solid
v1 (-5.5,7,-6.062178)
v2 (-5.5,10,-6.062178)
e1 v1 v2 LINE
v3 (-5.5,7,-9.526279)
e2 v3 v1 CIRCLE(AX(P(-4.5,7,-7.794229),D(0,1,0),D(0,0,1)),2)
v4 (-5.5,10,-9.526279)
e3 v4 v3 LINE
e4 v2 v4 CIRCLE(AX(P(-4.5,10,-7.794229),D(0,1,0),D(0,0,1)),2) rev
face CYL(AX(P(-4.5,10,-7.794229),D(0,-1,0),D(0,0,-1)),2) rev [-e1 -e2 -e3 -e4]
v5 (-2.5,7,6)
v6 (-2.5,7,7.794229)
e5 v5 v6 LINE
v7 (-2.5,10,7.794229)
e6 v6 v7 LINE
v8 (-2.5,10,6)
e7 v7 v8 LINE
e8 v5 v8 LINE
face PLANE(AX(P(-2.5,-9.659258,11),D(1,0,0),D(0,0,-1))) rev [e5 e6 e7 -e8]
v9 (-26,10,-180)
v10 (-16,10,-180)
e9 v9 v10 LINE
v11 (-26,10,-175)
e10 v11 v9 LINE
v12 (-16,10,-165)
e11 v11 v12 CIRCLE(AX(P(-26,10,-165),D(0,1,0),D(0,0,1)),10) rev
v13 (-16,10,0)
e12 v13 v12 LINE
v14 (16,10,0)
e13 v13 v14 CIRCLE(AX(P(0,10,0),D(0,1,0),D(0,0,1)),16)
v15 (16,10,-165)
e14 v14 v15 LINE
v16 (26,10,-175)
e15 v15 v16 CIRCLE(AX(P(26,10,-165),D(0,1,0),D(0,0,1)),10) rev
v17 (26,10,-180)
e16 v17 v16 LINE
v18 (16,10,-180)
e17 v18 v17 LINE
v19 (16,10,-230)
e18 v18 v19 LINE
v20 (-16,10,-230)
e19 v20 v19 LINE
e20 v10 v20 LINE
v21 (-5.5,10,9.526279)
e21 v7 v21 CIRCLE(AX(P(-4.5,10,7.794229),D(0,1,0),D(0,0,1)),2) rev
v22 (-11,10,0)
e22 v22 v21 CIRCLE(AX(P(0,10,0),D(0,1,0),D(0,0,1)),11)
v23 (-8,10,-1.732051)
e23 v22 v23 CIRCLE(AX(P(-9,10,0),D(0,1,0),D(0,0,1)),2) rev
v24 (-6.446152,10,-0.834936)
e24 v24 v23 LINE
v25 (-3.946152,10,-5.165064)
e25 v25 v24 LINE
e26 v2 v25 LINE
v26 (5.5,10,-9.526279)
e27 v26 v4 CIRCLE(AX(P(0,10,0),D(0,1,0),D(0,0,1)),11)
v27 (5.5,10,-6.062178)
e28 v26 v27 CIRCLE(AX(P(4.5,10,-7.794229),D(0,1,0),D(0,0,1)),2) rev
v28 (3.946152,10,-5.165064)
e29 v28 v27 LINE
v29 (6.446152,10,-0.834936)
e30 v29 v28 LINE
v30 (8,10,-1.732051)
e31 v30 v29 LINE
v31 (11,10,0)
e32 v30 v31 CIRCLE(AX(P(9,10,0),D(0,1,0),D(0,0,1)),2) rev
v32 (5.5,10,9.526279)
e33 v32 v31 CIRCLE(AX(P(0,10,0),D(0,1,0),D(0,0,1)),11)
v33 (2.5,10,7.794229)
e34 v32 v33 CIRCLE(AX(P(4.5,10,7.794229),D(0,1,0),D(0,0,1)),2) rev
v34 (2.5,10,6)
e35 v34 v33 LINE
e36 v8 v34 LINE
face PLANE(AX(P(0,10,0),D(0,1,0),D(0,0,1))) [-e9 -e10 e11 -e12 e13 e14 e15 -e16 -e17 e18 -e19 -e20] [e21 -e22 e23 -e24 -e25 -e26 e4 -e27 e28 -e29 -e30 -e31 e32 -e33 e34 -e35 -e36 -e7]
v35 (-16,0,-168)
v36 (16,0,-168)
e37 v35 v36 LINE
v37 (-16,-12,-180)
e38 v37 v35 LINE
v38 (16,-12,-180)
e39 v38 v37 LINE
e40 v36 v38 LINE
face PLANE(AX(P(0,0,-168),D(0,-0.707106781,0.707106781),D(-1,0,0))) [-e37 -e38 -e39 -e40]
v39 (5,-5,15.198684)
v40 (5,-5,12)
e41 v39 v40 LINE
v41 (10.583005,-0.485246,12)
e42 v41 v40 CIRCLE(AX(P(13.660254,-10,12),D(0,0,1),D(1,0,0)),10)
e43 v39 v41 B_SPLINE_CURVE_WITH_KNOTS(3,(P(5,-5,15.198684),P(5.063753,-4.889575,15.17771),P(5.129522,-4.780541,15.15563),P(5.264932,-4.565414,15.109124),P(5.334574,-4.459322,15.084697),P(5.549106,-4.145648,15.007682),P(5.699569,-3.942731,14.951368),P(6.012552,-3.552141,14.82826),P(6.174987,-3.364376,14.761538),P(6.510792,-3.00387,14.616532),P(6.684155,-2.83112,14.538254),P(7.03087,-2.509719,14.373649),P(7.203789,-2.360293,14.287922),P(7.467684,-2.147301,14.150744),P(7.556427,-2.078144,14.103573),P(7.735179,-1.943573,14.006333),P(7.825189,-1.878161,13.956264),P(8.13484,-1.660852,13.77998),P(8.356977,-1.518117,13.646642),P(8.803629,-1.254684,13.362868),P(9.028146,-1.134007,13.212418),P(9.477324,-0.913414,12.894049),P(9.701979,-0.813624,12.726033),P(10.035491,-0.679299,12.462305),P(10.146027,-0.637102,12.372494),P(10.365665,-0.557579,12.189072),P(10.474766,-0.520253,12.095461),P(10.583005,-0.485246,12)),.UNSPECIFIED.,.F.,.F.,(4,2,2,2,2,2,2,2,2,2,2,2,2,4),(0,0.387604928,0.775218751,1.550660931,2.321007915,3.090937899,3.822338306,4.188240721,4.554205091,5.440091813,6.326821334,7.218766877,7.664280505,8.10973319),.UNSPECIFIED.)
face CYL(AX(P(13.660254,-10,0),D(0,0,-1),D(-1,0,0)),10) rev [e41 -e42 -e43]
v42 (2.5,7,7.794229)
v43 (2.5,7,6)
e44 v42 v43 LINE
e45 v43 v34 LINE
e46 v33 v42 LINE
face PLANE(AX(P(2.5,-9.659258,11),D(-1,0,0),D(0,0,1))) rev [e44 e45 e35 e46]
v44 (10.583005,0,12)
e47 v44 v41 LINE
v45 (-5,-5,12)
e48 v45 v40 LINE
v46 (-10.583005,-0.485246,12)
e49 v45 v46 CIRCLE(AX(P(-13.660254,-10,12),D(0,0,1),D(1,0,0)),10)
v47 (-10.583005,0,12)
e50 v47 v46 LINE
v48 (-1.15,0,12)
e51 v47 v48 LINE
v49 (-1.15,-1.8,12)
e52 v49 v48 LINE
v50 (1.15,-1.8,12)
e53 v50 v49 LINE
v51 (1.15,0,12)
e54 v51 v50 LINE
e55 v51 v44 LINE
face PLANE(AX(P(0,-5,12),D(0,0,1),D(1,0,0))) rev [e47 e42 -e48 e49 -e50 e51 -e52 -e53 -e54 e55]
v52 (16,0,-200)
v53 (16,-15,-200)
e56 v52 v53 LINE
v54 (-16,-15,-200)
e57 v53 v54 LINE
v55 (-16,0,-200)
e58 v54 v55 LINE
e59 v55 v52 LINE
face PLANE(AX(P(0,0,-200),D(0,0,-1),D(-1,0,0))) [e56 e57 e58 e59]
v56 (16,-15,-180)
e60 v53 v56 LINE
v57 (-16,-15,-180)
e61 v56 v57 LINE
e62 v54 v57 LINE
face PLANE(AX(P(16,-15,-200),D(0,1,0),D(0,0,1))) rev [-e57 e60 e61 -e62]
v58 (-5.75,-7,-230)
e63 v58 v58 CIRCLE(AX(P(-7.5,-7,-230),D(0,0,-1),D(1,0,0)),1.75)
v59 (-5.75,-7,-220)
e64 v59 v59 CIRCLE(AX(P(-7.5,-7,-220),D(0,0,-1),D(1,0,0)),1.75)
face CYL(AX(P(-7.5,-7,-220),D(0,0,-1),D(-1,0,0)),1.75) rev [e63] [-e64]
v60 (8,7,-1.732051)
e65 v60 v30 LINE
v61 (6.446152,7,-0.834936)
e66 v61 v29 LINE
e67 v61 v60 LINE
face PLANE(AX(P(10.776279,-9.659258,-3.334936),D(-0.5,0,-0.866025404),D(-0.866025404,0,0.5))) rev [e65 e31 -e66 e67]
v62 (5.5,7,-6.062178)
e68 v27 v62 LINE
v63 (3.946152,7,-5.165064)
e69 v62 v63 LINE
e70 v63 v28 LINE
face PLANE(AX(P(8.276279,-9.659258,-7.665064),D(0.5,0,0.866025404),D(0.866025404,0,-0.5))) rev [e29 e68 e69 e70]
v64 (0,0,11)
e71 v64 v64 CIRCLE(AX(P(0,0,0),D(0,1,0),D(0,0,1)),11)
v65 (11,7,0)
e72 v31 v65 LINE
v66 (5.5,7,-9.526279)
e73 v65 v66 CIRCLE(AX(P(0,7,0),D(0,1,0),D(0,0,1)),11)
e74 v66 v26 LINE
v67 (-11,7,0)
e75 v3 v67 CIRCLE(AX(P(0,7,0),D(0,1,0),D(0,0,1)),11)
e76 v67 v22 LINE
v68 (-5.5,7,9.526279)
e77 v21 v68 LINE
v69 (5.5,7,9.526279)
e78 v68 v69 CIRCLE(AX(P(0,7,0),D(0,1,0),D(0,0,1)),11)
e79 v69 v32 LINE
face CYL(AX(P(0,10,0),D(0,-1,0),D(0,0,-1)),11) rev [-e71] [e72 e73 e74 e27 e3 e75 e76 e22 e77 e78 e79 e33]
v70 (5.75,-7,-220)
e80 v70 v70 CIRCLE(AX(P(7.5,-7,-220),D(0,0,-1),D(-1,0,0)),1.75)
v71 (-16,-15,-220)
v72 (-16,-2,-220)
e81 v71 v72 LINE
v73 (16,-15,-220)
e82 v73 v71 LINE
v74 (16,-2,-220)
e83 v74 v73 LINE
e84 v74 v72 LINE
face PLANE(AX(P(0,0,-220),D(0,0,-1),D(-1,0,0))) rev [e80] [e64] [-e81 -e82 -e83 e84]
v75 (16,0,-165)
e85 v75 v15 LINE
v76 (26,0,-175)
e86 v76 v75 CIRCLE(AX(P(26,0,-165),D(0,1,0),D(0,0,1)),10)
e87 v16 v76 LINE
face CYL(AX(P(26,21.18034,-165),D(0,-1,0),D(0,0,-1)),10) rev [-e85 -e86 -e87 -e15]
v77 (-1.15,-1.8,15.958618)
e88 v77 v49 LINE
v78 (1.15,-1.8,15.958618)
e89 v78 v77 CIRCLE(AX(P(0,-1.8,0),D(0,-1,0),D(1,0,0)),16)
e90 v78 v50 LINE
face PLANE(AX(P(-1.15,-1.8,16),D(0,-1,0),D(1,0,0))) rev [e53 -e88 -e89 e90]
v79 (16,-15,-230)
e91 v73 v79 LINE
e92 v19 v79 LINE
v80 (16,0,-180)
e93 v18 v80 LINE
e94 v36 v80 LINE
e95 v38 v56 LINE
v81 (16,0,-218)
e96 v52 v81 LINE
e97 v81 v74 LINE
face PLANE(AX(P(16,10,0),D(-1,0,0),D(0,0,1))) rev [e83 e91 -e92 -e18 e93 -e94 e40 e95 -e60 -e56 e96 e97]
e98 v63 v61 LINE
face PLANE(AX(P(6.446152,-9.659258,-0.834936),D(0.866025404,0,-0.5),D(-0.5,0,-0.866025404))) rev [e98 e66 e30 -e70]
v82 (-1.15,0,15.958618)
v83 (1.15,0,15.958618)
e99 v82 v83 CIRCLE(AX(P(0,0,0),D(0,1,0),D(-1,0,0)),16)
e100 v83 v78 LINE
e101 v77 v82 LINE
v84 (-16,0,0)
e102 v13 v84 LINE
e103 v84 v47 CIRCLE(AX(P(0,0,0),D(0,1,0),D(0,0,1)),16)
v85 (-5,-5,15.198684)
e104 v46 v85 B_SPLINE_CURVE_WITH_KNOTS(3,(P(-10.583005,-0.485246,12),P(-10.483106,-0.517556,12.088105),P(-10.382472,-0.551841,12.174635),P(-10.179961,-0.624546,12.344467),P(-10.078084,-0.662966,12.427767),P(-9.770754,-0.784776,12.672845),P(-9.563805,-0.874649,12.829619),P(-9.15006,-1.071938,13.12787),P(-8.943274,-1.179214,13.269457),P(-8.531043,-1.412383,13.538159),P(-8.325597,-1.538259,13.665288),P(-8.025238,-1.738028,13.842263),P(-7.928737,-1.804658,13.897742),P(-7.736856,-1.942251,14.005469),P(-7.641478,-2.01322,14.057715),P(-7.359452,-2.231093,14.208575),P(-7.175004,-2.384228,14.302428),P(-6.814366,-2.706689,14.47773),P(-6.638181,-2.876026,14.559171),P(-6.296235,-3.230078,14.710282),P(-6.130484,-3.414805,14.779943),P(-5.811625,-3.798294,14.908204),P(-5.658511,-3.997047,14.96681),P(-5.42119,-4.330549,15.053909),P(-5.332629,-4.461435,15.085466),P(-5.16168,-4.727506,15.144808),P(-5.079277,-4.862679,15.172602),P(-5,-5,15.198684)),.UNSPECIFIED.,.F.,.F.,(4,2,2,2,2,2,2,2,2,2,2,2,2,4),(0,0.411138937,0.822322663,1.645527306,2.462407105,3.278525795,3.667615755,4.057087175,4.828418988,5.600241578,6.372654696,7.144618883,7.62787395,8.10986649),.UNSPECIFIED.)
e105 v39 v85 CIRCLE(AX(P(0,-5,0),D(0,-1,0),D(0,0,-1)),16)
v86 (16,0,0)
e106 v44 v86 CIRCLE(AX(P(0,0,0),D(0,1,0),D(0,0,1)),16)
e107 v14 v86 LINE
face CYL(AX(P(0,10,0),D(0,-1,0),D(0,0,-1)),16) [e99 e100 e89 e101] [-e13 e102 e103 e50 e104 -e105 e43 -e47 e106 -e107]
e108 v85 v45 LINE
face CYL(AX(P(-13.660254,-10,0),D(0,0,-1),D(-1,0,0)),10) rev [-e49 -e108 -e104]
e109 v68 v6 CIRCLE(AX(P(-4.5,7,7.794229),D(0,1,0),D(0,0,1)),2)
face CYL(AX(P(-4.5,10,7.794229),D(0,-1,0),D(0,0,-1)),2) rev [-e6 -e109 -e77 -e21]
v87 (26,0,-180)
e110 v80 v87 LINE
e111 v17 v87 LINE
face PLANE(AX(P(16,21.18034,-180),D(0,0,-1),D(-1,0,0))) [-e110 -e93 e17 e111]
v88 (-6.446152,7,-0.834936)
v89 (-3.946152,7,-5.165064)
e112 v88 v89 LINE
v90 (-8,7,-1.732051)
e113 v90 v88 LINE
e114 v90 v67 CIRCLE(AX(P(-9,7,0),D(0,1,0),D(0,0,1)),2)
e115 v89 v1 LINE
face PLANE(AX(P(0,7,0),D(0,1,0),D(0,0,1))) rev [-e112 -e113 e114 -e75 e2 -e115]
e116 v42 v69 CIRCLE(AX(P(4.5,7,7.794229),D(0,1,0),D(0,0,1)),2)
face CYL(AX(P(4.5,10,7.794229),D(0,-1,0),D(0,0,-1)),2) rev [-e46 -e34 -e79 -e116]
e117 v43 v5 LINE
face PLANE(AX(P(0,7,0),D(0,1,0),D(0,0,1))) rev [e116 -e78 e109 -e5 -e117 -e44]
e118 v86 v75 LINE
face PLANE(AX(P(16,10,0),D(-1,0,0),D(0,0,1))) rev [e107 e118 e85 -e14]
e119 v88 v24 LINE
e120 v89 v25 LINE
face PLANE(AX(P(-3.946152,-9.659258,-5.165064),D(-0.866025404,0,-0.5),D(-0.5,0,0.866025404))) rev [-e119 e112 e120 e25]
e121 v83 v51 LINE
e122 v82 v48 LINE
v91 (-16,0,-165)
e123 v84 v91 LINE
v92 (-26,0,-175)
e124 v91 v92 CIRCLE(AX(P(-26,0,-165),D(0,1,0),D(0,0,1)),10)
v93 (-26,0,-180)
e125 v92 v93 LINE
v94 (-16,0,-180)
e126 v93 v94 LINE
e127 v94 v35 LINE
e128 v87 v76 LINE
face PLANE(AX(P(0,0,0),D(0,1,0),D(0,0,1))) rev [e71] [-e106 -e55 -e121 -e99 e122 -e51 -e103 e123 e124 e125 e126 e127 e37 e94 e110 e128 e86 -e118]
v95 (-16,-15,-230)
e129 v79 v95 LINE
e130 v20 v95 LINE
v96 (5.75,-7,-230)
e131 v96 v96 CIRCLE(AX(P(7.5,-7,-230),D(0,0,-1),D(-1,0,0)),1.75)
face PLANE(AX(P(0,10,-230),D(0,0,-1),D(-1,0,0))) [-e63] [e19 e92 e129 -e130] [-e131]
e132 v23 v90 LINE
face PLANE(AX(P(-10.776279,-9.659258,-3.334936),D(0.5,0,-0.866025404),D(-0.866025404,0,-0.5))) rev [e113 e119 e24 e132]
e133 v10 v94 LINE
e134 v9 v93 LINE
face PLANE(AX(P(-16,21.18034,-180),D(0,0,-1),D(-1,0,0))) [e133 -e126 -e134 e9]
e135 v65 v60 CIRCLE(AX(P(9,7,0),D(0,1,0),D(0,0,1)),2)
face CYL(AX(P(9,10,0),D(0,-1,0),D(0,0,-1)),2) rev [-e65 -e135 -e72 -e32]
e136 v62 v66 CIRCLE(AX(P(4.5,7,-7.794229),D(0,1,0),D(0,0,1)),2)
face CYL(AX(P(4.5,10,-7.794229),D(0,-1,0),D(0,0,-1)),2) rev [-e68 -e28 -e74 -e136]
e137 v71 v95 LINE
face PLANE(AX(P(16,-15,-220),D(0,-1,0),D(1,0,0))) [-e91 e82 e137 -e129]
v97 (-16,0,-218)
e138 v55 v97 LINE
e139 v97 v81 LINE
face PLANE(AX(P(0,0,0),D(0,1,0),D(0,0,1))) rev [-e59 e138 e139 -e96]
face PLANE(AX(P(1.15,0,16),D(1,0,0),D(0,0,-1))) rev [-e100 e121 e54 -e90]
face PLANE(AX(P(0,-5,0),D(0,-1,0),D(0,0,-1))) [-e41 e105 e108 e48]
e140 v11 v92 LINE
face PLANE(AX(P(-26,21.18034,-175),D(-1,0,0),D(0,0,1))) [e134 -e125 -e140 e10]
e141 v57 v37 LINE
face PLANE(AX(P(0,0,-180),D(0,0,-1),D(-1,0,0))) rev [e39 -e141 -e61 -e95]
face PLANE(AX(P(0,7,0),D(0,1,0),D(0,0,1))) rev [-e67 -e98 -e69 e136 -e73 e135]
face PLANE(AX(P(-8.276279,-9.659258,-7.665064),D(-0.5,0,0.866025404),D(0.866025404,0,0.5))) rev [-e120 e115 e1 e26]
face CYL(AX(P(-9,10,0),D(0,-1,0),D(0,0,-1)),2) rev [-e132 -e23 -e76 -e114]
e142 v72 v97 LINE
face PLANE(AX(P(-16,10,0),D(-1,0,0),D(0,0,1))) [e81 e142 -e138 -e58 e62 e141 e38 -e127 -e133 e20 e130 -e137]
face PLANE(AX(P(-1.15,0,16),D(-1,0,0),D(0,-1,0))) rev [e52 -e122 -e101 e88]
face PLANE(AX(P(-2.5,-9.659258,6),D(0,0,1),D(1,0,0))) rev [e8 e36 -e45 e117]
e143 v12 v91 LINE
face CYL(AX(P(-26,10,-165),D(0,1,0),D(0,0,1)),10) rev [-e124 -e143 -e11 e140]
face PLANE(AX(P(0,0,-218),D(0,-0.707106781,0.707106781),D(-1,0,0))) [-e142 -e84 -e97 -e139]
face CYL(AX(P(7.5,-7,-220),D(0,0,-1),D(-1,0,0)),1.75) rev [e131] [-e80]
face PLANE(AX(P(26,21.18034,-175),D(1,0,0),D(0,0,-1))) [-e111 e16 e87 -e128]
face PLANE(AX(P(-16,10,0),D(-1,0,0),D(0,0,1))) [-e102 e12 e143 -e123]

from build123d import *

# Parameters (mm, degrees)
BOSS_EXTRUDE1_DEPTH = 10
SKETCH2_W           = 32
SKETCH2_H           = 15
SKETCH2_R           = 1.75
BOSS_EXTRUDE2_DEPTH = 10
CHAMFER1_SIZE       = 2
SKETCH3_W           = 5
SKETCH3_H           = 5
BOSS_EXTRUDE5_DEPTH = 3
BOSS_EXTRUDE6_START = -5
BOSS_EXTRUDE6_DEPTH = 5
SKETCH7_W           = 2.3
SKETCH7_H           = 1.8
CUT_EXTRUDE2_DEPTH  = 243.991769408
FILLET2_R           = 2
SKETCH8_W           = 10
SKETCH8_H           = 5
BOSS_EXTRUDE7_DEPTH = 10
FILLET3_R           = 10
SKETCH9_W           = 32
SKETCH9_H           = 15
BOSS_EXTRUDE8_DEPTH = 20
FILLET4_R           = 10
CHAMFER2_SIZE       = 12


# Some blends are built 0.0001 mm under size
with BuildPart() as part:
    # Sketch1 → Boss-Extrude1 (new body)
    with BuildSketch(Plane(origin=(0, 0, 0), x_dir=(1, 0, 0), z_dir=(0, 1, 0))):
        with BuildLine():
            ThreePointArc((-16, 0), (0, 16), (16, 0))
            Line((16, 0), (16, 230))
            Line((16, 230), (-16, 230))
            Line((-16, 230), (-16, 0))
        make_face()
        with BuildLine():
            ThreePointArc((-11, 0), (0, 11), (11, 0))
            Line((11, 0), (16, 0))
            ThreePointArc((16, 0), (0, 16), (-16, 0))
            Line((-16, 0), (-11, 0))
        make_face()
        with BuildLine():
            Line((16, 0), (11, 0))
            ThreePointArc((11, 0), (0, -11), (-11, 0))
            Line((-11, 0), (-16, 0))
            ThreePointArc((-16, 0), (0, -16), (16, 0))
        make_face()
    extrude(amount=BOSS_EXTRUDE1_DEPTH)

    # Sketch2 → Boss-Extrude2 (add)
    with BuildSketch(Plane(origin=(0, 0, -230), x_dir=(-1, 0, 0), z_dir=(0, 0, -1))):
        with Locations((0, -7.5)):
            Rectangle(SKETCH2_W, SKETCH2_H)
        with Locations((-7.5, -7)):
            Circle(SKETCH2_R, mode=Mode.SUBTRACT)
        with Locations(Location((7.5, -7, 0), (0, 0, 180))):
            Circle(SKETCH2_R, mode=Mode.SUBTRACT)
    extrude(amount=-BOSS_EXTRUDE2_DEPTH)

    # Chamfer1
    chamfer1_edges = [part.edges().sort_by_distance(p)[0] for p in [
        (0, 0, -220),
    ]]
    chamfer(chamfer1_edges, length=CHAMFER1_SIZE)

    # Sketch3 → Boss-Extrude5 (add)
    with BuildSketch(Plane.XZ.offset(-10)):
        with Locations((0, 8.5)):
            Rectangle(SKETCH3_W, SKETCH3_H)
        Polygon((10.776279442, -3.334936491), (6.446152423, -0.834936491), (3.946152423, -5.165063509), (8.276279442, -7.665063509), align=None)
        Polygon((-8.276279442, -7.665063509), (-3.946152423, -5.165063509), (-6.446152423, -0.834936491), (-10.776279442, -3.334936491), align=None)
    extrude(amount=BOSS_EXTRUDE5_DEPTH)

    # Sketch4 → Boss-Extrude6 (add)
    with BuildSketch(Plane(origin=(0, 0, 0), x_dir=(1, 0, 0), z_dir=(0, 1, 0)).offset(BOSS_EXTRUDE6_START)):
        with BuildLine():
            Line((5, -12), (-5, -12))
            Line((-5, -12), (-5, -15.198684154))
            ThreePointArc((-5, -15.198684154), (0, -16), (5, -15.198684154))
            Line((5, -15.198684154), (5, -12))
        make_face()
    extrude(amount=BOSS_EXTRUDE6_DEPTH)

    # Sketch7 → Cut-Extrude2 (cut, through all)
    with BuildSketch(Plane(origin=(0, 0, 12), x_dir=(-1, 0, 0), z_dir=(0, 0, -1))):
        with Locations((0, -0.9)):
            Rectangle(SKETCH7_W, SKETCH7_H)
    extrude(amount=-CUT_EXTRUDE2_DEPTH, mode=Mode.SUBTRACT)

    # Fillet2
    fillet2_edges = [part.edges().sort_by_distance(p)[0] for p in [
        (2.5, 8.5, 10.712142643),
        (-2.5, 8.5, 10.712142643),
        (8.026987658, 8.5, -7.521134831),
        (10.526987658, 8.5, -3.191007812),
        (-10.526987658, 8.5, -3.191007812),
        (-8.026987658, 8.5, -7.521134831),
    ]]
    fillet(fillet2_edges, radius=FILLET2_R - 0.0001)  # a hair under: the kernel refuses the full size

    # Sketch8 → Boss-Extrude7 (add)
    with BuildSketch(Plane.XZ):
        with Locations((21, -177.5)):
            Rectangle(SKETCH8_W, SKETCH8_H)
        with Locations((-21, -177.5)):
            Rectangle(SKETCH8_W, SKETCH8_H)
    extrude(amount=-BOSS_EXTRUDE7_DEPTH)

    # Fillet3
    fillet3_edges = [part.edges().sort_by_distance(p)[0] for p in [
        (16, 5, -175),
        (-16, 5, -175),
    ]]
    fillet(fillet3_edges, radius=FILLET3_R - 0.0001)  # a hair under: the kernel refuses the full size

    # Sketch9 → Boss-Extrude8 (add)
    with BuildSketch(Plane(origin=(0, 0, -180), x_dir=(-1, 0, 0), z_dir=(0, 0, -1))):
        with Locations((0, -7.5)):
            Rectangle(SKETCH9_W, SKETCH9_H)
    extrude(amount=BOSS_EXTRUDE8_DEPTH)

    # Fillet4
    # the kernel refuses this fillet: 10 mm, written as the material it adds along each edge
    with BuildSketch(Plane(origin=(-5, 0, 12), x_dir=(-1, 0, 0), z_dir=(0, 0, 1))) as fillet4_piece_1_section:
        with BuildLine():
            CenterArc((8.660254038, 10), FILLET4_R, 210, 60)
            Line((0, 5), (0, 0))
            Line((0, 0), (8.660254038, 0))
        make_face()
    fillet4_piece_1 = extrude(amount=24.849319248, mode=Mode.PRIVATE)
    fillet4_piece_1 = fillet4_piece_1 & Plane(origin=(0, 0, 0), x_dir=(-1, 0, 0), z_dir=(0, -1, 0)) * Cylinder(16, 85, mode=Mode.PRIVATE)
    add(fillet4_piece_1)
    with BuildSketch(Plane(origin=(5, 0, 36.849319248), x_dir=(1, 0, 0), z_dir=(0, 0, -1))) as fillet4_piece_2_section:
        with BuildLine():
            CenterArc((8.660254038, 10), FILLET4_R, 210, 60)
            Line((0, 5), (0, 0))
            Line((0, 0), (8.660254038, 0))
        make_face()
    fillet4_piece_2 = extrude(amount=24.849319248, mode=Mode.PRIVATE)
    fillet4_piece_2 = fillet4_piece_2 & Plane(origin=(0, 0, 0), x_dir=(-1, 0, 0), z_dir=(0, -1, 0)) * Cylinder(16, 85, mode=Mode.PRIVATE)
    add(fillet4_piece_2)

    # Chamfer2
    chamfer2_edges = [part.edges().sort_by_distance(p)[0] for p in [
        (0, 0, -180),
    ]]
    chamfer(chamfer2_edges, length=CHAMFER2_SIZE)


solid = part.part
